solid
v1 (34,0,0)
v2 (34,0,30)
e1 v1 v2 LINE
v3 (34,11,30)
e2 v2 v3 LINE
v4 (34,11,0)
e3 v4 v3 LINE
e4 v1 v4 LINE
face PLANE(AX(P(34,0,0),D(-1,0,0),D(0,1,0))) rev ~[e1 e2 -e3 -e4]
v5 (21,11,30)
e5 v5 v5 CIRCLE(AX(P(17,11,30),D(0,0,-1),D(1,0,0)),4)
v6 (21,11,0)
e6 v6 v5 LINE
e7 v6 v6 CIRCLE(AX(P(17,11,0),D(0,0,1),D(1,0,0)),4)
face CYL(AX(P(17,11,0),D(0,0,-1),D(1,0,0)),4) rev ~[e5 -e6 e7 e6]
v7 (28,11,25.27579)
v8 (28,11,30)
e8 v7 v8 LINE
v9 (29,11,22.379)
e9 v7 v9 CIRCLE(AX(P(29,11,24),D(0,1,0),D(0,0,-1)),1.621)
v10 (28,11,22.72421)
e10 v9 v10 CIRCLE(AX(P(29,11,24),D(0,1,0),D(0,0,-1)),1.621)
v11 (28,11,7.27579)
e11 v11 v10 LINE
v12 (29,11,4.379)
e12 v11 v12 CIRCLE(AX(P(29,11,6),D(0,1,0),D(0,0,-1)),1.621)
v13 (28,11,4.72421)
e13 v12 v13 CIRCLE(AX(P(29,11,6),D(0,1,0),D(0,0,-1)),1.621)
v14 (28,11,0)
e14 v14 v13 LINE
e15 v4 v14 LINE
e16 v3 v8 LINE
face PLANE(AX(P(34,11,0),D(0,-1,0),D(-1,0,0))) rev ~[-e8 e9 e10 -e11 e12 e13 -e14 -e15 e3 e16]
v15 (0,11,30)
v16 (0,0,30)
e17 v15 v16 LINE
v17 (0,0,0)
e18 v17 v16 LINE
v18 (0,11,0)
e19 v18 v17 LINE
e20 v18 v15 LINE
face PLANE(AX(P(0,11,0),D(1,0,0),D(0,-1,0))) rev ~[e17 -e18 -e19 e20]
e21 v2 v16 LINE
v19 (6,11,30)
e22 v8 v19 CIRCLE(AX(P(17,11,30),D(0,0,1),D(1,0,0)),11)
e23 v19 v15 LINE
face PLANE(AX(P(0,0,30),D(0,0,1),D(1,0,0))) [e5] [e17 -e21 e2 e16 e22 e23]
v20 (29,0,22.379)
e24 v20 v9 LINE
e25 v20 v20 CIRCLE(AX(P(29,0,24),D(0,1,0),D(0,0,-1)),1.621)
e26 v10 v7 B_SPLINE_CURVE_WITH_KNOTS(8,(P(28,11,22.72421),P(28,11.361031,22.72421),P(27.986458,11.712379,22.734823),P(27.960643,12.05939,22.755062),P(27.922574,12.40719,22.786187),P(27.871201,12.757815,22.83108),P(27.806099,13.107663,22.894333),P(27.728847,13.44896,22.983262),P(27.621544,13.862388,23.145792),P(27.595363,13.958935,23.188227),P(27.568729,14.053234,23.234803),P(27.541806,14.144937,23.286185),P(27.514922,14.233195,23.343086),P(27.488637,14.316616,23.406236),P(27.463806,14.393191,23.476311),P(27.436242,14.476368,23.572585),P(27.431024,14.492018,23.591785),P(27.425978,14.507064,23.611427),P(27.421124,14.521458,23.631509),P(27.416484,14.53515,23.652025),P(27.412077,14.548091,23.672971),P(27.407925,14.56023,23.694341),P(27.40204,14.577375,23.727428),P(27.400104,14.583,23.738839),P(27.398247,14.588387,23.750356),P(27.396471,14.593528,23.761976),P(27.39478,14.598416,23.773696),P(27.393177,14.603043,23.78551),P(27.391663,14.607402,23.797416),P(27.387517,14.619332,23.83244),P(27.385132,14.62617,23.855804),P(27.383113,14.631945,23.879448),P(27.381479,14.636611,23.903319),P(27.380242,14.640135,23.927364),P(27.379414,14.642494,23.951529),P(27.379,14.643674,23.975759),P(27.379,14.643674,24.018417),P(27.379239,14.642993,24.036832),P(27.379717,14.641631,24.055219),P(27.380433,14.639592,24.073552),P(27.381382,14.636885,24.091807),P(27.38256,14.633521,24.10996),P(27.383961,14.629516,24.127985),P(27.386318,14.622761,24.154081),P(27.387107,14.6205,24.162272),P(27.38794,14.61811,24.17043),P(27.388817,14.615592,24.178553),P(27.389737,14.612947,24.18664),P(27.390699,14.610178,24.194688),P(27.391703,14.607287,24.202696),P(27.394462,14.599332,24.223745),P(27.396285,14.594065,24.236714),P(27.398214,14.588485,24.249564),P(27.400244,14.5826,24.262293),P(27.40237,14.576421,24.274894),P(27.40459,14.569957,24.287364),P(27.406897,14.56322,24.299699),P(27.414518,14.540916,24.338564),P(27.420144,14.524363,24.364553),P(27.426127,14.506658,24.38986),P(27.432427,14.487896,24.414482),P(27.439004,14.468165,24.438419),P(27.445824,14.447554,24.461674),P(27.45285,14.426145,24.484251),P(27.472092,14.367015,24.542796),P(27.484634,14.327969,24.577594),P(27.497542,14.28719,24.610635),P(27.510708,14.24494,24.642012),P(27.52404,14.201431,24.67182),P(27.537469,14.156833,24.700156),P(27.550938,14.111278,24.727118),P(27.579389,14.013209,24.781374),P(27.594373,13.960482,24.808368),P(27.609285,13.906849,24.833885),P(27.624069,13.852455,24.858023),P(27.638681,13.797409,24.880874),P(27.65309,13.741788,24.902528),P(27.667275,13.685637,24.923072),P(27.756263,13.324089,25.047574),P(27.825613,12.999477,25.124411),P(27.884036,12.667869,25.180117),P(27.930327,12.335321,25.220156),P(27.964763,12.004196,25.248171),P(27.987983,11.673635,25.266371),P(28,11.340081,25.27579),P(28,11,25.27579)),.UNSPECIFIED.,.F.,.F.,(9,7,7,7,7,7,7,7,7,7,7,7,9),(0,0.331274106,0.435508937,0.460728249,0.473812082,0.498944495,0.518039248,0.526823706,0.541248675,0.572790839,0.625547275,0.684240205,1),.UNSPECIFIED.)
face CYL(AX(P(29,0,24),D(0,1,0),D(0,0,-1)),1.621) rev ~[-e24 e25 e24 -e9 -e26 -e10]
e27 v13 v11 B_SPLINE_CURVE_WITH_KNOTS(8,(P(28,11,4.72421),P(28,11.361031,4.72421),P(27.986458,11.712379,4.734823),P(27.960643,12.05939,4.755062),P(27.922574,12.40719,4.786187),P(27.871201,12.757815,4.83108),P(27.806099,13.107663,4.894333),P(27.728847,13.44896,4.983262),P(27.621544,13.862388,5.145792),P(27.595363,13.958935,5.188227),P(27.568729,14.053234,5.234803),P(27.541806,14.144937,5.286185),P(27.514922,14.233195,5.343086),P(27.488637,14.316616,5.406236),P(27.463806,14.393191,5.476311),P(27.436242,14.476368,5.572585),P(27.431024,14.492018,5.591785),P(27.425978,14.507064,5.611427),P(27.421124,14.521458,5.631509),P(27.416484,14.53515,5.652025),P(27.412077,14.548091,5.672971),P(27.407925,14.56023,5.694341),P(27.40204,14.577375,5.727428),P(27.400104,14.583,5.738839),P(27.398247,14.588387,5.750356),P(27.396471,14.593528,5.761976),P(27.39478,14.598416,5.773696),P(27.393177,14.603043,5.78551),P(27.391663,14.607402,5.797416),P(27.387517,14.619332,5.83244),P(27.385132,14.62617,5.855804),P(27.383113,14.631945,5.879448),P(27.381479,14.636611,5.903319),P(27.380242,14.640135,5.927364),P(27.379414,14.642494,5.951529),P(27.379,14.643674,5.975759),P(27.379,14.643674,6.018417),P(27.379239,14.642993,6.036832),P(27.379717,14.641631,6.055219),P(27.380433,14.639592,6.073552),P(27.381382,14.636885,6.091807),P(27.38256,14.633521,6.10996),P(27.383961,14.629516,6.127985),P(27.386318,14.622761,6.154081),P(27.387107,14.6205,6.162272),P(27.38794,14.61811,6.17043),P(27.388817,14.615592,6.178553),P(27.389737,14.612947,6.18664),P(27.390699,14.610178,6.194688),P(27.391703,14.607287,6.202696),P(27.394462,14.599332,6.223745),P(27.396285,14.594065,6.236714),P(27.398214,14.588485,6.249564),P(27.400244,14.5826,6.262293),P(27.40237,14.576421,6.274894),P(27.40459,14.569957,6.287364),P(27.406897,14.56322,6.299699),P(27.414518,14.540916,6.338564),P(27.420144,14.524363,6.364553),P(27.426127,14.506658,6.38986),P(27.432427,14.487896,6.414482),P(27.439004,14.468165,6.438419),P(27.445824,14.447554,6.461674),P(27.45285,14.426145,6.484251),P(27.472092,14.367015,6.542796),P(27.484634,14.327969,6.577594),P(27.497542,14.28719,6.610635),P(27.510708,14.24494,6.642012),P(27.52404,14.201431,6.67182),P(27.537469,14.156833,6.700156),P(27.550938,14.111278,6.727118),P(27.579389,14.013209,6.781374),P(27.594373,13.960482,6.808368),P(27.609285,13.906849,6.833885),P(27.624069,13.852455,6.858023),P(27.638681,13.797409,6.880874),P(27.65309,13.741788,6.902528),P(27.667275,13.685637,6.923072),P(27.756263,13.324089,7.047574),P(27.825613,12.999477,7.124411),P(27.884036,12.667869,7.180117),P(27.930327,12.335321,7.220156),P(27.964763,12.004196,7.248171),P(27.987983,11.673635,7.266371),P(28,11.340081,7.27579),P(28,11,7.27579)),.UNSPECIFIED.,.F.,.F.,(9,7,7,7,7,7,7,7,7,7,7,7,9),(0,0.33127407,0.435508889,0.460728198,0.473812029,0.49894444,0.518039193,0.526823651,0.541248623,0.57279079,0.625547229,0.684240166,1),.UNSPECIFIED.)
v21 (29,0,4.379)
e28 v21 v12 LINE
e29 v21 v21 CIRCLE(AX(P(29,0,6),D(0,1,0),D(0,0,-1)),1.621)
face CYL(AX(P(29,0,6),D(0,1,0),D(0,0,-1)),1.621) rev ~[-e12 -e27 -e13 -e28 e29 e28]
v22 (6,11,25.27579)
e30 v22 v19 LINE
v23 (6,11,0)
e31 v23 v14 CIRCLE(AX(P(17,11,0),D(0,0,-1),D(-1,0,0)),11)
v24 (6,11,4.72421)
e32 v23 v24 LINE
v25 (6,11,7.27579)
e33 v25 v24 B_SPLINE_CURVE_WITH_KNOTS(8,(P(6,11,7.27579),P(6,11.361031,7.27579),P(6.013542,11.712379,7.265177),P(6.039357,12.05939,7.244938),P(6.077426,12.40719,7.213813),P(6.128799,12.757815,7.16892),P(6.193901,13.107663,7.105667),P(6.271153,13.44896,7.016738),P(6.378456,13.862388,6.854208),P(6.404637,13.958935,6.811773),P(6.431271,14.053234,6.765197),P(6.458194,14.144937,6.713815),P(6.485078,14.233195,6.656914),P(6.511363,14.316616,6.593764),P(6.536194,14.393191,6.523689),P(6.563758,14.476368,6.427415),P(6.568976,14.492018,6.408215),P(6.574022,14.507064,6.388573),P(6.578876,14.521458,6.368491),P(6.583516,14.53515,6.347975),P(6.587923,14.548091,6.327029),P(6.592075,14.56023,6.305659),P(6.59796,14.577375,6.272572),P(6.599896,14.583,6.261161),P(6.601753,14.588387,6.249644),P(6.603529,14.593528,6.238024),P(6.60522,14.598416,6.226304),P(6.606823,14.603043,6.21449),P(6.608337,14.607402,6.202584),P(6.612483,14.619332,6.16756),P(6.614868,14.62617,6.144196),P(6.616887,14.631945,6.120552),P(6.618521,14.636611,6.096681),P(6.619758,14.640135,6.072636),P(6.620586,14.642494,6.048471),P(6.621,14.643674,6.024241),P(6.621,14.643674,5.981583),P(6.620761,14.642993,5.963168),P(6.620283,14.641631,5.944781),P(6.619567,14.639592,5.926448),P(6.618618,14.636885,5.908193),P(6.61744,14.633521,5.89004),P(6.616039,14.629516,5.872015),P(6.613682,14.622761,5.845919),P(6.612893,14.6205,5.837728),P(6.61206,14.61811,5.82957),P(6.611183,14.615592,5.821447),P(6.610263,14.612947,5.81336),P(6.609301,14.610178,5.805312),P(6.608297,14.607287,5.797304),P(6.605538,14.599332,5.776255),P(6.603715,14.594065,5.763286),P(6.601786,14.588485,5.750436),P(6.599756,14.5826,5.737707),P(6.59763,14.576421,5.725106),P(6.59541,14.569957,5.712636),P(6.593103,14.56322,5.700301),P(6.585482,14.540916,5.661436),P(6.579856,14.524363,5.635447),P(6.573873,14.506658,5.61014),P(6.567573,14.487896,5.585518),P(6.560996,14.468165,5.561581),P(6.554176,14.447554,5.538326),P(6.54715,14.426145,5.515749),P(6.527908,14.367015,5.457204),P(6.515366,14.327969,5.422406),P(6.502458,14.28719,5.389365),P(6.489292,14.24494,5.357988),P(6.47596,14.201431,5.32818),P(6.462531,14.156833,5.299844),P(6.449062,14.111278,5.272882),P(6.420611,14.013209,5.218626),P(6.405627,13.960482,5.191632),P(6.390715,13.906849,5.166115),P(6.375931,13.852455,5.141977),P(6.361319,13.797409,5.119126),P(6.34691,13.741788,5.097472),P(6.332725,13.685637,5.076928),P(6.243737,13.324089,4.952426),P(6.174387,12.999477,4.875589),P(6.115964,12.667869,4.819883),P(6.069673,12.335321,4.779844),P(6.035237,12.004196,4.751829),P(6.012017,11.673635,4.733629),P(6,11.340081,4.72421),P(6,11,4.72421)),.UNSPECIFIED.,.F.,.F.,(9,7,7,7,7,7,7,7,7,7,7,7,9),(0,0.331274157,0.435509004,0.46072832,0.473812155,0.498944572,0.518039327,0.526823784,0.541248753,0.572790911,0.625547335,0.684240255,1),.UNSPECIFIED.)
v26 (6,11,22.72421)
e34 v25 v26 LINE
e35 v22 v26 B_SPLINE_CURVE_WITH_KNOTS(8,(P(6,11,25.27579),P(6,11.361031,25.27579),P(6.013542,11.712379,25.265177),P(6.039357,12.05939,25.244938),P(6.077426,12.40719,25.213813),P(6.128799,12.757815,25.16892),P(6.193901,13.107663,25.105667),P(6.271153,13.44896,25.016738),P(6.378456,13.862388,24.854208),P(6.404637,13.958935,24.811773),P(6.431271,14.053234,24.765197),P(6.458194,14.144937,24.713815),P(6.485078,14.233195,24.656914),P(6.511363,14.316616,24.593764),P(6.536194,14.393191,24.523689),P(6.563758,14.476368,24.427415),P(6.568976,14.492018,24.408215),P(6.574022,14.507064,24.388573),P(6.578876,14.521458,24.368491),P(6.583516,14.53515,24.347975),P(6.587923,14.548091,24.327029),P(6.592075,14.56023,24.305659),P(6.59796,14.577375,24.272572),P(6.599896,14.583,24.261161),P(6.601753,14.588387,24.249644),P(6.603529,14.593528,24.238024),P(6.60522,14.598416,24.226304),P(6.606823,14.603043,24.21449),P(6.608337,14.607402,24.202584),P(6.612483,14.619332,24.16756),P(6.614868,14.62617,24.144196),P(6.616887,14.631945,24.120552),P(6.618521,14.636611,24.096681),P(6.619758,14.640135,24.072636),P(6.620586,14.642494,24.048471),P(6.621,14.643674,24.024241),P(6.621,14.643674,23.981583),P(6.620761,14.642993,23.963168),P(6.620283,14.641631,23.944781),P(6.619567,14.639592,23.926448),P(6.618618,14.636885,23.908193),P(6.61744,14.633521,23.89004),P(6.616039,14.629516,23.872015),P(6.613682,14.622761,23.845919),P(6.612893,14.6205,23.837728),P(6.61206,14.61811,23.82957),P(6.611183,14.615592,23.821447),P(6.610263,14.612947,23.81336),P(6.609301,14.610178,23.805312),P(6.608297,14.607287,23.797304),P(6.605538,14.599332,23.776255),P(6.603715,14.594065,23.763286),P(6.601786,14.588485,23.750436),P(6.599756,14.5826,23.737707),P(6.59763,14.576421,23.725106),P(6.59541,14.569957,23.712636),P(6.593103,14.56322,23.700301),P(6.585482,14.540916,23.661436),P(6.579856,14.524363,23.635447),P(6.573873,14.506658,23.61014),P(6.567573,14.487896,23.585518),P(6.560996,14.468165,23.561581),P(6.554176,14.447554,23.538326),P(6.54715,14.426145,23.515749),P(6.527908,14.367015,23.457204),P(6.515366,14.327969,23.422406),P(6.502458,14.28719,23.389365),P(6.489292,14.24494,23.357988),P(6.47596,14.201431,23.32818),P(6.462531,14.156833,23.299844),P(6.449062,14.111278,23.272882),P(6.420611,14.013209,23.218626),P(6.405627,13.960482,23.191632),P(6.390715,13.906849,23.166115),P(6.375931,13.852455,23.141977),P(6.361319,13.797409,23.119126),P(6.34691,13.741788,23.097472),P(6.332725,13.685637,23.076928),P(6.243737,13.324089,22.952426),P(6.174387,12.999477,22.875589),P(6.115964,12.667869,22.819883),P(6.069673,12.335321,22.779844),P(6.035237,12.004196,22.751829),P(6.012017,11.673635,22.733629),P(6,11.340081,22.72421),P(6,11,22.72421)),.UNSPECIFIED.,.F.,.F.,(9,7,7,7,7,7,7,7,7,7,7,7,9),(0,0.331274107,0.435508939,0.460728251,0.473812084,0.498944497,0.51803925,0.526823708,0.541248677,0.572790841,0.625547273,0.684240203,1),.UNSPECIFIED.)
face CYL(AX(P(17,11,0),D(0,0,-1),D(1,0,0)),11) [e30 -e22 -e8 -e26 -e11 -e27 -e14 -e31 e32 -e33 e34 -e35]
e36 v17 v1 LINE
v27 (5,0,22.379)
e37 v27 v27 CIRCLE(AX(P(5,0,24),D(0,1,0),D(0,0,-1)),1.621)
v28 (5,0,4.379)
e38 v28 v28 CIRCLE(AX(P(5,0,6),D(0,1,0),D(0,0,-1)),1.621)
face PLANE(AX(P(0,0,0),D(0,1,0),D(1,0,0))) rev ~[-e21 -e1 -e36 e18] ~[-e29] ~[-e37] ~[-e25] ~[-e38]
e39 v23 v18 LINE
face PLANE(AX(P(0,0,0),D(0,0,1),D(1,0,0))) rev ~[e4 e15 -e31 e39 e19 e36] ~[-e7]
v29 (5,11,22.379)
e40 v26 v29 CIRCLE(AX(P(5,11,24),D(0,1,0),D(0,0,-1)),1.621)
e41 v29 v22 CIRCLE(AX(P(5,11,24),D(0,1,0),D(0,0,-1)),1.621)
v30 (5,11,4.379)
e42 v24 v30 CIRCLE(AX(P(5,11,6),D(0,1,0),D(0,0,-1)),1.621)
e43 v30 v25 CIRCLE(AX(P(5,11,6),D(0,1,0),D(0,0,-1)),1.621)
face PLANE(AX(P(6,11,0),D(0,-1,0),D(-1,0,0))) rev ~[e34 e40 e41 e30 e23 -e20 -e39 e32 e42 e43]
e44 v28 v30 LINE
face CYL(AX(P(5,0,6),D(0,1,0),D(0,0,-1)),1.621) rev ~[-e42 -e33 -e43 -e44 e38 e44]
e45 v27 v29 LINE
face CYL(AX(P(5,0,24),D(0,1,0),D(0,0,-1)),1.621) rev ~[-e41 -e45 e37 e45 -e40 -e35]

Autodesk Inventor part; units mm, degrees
ref_plane "YZ Plane" through (0, 0, 0) normal (1, 0, 0) x (0, 1, 0)
ref_plane "XZ Plane" through (0, 0, 0) normal (0, 1, 0) x (-1, 0, 0)
ref_plane "XY Plane" through (0, 0, 0) normal (0, 0, 1) x (1, 0, 0)
sketch "Sketch1" plane through (0, 0, 0) normal (0, 0, 1) x (1, 0, 0)
  line L0 (0, 0) -> (34, 0)
  line L1 (34, 0) -> (34, 11)
  line L2 (34, 11) -> (0, 11)
  line L3 (0, 11) -> (0, 0)
  circle A0 centre (17, 11) radius 11
  circle A1 centre (17, 11) radius 4
  line L4 (9.5554, 22) -> (24.3175, 22)
  point P0 (28, 11)
  point P1 (6, 11)
  dimension "d0" = 34
  dimension "d1" = 11
  dimension "d3" = 8
  dimension "d4" = 22
extrude "Extrusion1" add sketch "Sketch1" along normal blind 30 contours L3 L2 A0 L0 | A0 L2 L1 L0 | A0 L2 A1 | A0 L2 A1
sketch "Sketch2" plane through (0, 0, 0) normal (0, -1, 0) x (1, 0, 0)
  line L0 (34, 0) -> (34, 30) projected
  line L1 (0, 0) -> (0, 30) projected
  line L2 (0, 0) -> (34, 0) projected
  line L3 (0, 30) -> (34, 30) projected
  point P0 (5, 24)
  point P1 (29, 24)
  point P2 (29, 6)
  point P3 (5, 6)
  dimension "d7" = 24
  dimension "d8" = 18
  dimension "d9" = 5
  dimension "d10" = 5
  dimension "d11" = 6
  dimension "d12" = 6
hole "Hole1" at (5, 0, 24) at (29, 0, 24) at (29, 0, 6) at (5, 0, 6) direction (0, 1, 0) diameter 3.242 end through all thread size "M4x0.7" class "6H" standard "ANSI Metric M Profile"
equation "\"d9\" = d10"
equation "\"d11\" = d12"
properties part number "Pillow block bearing"
